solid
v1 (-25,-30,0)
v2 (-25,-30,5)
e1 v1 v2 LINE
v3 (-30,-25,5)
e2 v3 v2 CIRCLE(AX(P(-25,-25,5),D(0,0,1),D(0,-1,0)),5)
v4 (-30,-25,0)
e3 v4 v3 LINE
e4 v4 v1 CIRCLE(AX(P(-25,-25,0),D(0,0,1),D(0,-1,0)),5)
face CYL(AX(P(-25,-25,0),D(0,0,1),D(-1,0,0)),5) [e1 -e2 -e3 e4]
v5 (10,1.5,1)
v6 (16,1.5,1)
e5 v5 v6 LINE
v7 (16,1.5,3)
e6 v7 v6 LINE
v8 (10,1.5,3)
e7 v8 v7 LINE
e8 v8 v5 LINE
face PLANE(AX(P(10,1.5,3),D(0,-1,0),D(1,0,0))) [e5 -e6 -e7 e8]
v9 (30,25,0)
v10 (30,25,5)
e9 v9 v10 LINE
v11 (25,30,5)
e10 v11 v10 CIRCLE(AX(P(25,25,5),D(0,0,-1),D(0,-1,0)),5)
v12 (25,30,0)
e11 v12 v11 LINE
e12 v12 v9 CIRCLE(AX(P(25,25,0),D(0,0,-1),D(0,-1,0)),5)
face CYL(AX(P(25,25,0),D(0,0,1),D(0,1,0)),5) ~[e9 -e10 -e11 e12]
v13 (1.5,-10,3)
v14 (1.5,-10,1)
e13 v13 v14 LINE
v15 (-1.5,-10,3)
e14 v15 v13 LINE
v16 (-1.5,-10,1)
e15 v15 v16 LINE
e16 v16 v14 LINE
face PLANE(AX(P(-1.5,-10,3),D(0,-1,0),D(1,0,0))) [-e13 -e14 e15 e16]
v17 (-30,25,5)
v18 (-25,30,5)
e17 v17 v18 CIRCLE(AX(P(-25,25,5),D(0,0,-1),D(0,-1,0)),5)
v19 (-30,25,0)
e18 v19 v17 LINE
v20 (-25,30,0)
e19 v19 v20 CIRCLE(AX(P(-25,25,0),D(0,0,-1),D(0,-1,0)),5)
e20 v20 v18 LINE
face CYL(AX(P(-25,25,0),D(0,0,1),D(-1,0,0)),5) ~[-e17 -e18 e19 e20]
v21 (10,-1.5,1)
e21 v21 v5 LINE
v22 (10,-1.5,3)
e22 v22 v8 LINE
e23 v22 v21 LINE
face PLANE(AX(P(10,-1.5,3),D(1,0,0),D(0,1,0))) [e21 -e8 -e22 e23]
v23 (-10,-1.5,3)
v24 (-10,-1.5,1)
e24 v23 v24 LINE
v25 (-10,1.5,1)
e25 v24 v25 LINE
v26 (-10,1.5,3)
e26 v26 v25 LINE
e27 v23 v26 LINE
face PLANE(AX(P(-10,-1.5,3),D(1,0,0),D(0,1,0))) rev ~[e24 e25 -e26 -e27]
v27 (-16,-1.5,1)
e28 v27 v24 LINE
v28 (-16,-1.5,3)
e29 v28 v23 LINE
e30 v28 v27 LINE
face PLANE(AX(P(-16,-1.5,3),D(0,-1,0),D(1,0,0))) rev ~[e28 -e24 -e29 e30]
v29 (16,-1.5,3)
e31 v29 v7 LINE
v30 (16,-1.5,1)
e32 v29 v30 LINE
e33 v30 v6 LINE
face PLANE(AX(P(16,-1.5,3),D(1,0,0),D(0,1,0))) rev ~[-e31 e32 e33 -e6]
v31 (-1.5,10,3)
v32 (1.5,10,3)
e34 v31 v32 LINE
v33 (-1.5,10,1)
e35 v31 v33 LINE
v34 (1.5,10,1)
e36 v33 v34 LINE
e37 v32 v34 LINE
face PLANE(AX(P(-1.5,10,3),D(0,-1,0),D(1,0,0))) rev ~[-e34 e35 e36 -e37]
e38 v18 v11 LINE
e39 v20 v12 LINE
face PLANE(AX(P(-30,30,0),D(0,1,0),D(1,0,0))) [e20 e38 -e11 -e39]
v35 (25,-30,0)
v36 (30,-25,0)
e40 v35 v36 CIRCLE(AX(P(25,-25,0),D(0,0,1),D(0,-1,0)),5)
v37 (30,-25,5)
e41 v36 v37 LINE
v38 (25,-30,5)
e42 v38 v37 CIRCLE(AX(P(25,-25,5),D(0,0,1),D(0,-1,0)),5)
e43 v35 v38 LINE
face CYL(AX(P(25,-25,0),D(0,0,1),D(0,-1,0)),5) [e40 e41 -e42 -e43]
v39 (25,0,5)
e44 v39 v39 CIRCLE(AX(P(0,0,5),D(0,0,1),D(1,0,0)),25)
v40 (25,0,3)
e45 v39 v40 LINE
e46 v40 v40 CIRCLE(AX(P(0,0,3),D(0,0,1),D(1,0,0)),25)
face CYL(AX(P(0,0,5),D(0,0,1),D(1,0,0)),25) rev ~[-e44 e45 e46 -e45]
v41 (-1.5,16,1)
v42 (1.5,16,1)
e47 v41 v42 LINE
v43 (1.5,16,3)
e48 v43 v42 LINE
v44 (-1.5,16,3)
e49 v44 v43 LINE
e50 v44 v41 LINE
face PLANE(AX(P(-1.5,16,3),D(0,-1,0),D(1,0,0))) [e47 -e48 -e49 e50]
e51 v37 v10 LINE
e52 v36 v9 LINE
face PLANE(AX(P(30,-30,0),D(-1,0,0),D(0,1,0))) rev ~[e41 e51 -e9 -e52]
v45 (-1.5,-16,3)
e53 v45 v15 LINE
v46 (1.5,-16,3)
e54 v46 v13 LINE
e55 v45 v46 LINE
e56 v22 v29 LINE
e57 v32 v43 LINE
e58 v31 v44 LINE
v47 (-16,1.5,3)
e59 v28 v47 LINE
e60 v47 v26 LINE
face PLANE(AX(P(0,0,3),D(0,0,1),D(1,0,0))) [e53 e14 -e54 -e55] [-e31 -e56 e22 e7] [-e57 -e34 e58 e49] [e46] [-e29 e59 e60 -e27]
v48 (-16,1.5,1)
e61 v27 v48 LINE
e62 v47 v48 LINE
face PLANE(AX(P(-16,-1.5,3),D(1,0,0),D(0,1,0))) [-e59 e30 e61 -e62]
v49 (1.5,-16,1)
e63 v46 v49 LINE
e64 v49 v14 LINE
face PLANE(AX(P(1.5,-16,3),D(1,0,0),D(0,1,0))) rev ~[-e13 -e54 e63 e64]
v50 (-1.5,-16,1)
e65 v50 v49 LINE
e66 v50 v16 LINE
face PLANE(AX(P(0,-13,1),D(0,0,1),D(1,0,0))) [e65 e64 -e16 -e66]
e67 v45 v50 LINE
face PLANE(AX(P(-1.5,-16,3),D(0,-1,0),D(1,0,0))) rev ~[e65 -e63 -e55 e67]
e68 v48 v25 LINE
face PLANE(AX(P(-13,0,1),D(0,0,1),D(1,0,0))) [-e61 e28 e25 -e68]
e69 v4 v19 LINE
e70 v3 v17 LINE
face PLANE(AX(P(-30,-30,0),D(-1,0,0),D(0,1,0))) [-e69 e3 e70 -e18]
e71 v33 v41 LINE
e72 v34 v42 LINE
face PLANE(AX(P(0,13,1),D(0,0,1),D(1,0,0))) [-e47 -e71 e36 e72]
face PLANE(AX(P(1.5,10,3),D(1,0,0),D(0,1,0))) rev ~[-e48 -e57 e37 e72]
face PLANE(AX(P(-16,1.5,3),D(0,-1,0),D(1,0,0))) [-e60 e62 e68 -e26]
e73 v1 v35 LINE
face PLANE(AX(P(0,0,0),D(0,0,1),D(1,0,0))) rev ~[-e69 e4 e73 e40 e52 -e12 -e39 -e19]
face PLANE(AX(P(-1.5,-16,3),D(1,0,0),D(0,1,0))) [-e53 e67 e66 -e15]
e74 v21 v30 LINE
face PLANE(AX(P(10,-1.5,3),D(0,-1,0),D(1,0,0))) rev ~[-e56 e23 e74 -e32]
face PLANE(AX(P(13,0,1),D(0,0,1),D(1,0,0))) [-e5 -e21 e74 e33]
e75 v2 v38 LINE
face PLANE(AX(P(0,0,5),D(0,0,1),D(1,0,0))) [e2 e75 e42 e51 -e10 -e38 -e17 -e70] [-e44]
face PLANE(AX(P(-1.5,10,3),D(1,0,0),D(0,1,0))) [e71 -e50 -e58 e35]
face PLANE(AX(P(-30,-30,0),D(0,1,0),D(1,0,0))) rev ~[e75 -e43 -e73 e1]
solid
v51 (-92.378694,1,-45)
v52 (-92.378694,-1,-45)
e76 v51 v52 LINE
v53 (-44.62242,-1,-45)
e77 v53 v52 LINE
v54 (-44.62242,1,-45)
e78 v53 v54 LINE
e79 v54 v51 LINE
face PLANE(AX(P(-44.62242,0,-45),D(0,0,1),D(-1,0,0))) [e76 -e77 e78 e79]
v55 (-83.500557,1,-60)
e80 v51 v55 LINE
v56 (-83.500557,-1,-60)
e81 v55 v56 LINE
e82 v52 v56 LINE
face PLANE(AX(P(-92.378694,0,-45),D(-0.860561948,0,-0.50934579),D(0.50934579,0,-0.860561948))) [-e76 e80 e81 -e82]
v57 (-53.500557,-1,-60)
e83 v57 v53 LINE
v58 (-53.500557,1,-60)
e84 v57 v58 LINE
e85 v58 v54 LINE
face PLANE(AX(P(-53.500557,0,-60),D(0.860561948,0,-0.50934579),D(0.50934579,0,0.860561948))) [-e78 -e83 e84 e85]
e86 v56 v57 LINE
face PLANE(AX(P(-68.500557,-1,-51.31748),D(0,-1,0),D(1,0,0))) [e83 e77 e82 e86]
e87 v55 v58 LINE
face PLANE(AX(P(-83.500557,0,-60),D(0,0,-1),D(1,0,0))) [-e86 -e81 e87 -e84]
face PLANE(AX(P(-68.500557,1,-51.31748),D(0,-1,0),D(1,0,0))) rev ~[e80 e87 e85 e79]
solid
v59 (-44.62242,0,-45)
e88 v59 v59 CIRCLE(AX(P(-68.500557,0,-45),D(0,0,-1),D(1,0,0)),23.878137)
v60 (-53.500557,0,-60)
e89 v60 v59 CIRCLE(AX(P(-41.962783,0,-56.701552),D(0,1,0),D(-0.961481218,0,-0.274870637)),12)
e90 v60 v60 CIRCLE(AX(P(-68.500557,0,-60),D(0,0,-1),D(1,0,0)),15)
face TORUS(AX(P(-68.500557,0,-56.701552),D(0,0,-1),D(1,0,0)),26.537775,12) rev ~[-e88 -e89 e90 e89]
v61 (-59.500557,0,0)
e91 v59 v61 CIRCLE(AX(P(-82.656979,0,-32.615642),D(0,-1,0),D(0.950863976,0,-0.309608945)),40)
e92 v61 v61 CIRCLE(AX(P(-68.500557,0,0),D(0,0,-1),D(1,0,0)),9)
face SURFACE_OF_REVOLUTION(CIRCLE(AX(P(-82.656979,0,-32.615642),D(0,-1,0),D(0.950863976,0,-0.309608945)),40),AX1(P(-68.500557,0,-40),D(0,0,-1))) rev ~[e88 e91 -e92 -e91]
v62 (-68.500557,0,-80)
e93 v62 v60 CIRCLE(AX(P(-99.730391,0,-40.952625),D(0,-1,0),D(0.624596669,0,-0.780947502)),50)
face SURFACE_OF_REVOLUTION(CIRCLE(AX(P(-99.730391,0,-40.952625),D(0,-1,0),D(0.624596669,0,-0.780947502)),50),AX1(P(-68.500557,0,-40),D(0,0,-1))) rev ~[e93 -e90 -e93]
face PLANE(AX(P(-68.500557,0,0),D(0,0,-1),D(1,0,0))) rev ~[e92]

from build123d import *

# Parameters (mm, degrees)
F0_W      = 60
F0_H      = 60
F1_DEPTH  = 5
F2_R      = 25
F3_DEPTH  = 2
F4_R      = 5
F5_W      = 6
F5_H      = 3
F5_W_2    = 3
F5_H_2    = 6
F6_DEPTH  = 2
F7_W      = 7
F7_H      = 2
F10_DEPTH = 1


# Not quite as in the source:
# - a feature names something its author has since deleted; it is built from what else it names


with BuildPart() as f1:
    # F0 (on Top) → F1 (new body)
    with BuildSketch(Plane.XY):
        Rectangle(F0_W, F0_H)
    extrude(amount=F1_DEPTH)

    # F2 (on face) → F3 (cut)
    with BuildSketch(Plane.XY.offset(5)):
        Circle(F2_R)
    extrude(amount=-F3_DEPTH, mode=Mode.SUBTRACT)

    # F4
    f4_edges = [f1.edges().sort_by_distance(p)[0] for p in [
        (-30, -30, 2.5),
        (30, -30, 2.5),
        (30, 30, 2.5),
        (-30, 30, 2.5),
    ]]
    fillet(f4_edges, radius=F4_R)

    # F5 (on face) → F6 (cut)
    with BuildSketch(Plane.XY.offset(3)):
        with Locations((-13, 0)):
            Rectangle(F5_W, F5_H)
        with Locations((0, 13)):
            Rectangle(F5_W_2, F5_H_2)
        with Locations((13, 0)):
            Rectangle(F5_W, F5_H)
        with Locations((0, -13)):
            Rectangle(F5_W_2, F5_H_2)
    extrude(amount=-F6_DEPTH, mode=Mode.SUBTRACT)


with BuildPart() as f8:
    # F7 (on Front) → F8 (revolve)
    with BuildSketch(Plane.XZ):
        with Locations((-65.0005573104, -1)):
            Rectangle(F7_W, F7_H)
        with BuildLine():
            Line((-61.5005573104, -2), (-68.5005573104, -2))
            Line((-68.5005573104, -2), (-68.5005573104, -45))
            Line((-68.5005573104, -45), (-44.6224203376, -45))
            ThreePointArc((-44.6224203376, -45), (-44.6789062027, -20.0591316566), (-59.5005573104, 0))
            Line((-59.5005573104, 0), (-61.5005573104, 0))
            Line((-61.5005573104, 0), (-61.5005573104, -2))
        make_face()
        with BuildLine():
            Line((-44.6224203376, -45), (-68.5005573104, -45))
            Line((-68.5005573104, -45), (-68.5005573104, -60))
            Line((-68.5005573104, -60), (-53.5005573104, -60))
            ThreePointArc((-53.5005573104, -60), (-52.2895260676, -50.5894028799), (-44.6224203376, -45))
        make_face()
        with BuildLine():
            Line((-53.5005573104, -60), (-68.5005573104, -60))
            Line((-68.5005573104, -60), (-68.5005573104, -80))
            ThreePointArc((-68.5005573104, -80), (-59.7303907725, -70.9526249034), (-53.5005573104, -60))
        make_face()
    revolve(axis=Axis((-68.5005573104, 0, -40), (0, 0, -1)))


with BuildPart() as f10:
    # F9 (on Front) → F10 (new body, symmetric)
    with BuildSketch(Plane.XZ):
        Polygon((-44.6224203376, -45), (-92.3786942832, -45), (-83.5005573104, -60), (-53.5005573104, -60), align=None)
    extrude(amount=F10_DEPTH, both=True)


solid = Compound([f1.part, f8.part, f10.part])
